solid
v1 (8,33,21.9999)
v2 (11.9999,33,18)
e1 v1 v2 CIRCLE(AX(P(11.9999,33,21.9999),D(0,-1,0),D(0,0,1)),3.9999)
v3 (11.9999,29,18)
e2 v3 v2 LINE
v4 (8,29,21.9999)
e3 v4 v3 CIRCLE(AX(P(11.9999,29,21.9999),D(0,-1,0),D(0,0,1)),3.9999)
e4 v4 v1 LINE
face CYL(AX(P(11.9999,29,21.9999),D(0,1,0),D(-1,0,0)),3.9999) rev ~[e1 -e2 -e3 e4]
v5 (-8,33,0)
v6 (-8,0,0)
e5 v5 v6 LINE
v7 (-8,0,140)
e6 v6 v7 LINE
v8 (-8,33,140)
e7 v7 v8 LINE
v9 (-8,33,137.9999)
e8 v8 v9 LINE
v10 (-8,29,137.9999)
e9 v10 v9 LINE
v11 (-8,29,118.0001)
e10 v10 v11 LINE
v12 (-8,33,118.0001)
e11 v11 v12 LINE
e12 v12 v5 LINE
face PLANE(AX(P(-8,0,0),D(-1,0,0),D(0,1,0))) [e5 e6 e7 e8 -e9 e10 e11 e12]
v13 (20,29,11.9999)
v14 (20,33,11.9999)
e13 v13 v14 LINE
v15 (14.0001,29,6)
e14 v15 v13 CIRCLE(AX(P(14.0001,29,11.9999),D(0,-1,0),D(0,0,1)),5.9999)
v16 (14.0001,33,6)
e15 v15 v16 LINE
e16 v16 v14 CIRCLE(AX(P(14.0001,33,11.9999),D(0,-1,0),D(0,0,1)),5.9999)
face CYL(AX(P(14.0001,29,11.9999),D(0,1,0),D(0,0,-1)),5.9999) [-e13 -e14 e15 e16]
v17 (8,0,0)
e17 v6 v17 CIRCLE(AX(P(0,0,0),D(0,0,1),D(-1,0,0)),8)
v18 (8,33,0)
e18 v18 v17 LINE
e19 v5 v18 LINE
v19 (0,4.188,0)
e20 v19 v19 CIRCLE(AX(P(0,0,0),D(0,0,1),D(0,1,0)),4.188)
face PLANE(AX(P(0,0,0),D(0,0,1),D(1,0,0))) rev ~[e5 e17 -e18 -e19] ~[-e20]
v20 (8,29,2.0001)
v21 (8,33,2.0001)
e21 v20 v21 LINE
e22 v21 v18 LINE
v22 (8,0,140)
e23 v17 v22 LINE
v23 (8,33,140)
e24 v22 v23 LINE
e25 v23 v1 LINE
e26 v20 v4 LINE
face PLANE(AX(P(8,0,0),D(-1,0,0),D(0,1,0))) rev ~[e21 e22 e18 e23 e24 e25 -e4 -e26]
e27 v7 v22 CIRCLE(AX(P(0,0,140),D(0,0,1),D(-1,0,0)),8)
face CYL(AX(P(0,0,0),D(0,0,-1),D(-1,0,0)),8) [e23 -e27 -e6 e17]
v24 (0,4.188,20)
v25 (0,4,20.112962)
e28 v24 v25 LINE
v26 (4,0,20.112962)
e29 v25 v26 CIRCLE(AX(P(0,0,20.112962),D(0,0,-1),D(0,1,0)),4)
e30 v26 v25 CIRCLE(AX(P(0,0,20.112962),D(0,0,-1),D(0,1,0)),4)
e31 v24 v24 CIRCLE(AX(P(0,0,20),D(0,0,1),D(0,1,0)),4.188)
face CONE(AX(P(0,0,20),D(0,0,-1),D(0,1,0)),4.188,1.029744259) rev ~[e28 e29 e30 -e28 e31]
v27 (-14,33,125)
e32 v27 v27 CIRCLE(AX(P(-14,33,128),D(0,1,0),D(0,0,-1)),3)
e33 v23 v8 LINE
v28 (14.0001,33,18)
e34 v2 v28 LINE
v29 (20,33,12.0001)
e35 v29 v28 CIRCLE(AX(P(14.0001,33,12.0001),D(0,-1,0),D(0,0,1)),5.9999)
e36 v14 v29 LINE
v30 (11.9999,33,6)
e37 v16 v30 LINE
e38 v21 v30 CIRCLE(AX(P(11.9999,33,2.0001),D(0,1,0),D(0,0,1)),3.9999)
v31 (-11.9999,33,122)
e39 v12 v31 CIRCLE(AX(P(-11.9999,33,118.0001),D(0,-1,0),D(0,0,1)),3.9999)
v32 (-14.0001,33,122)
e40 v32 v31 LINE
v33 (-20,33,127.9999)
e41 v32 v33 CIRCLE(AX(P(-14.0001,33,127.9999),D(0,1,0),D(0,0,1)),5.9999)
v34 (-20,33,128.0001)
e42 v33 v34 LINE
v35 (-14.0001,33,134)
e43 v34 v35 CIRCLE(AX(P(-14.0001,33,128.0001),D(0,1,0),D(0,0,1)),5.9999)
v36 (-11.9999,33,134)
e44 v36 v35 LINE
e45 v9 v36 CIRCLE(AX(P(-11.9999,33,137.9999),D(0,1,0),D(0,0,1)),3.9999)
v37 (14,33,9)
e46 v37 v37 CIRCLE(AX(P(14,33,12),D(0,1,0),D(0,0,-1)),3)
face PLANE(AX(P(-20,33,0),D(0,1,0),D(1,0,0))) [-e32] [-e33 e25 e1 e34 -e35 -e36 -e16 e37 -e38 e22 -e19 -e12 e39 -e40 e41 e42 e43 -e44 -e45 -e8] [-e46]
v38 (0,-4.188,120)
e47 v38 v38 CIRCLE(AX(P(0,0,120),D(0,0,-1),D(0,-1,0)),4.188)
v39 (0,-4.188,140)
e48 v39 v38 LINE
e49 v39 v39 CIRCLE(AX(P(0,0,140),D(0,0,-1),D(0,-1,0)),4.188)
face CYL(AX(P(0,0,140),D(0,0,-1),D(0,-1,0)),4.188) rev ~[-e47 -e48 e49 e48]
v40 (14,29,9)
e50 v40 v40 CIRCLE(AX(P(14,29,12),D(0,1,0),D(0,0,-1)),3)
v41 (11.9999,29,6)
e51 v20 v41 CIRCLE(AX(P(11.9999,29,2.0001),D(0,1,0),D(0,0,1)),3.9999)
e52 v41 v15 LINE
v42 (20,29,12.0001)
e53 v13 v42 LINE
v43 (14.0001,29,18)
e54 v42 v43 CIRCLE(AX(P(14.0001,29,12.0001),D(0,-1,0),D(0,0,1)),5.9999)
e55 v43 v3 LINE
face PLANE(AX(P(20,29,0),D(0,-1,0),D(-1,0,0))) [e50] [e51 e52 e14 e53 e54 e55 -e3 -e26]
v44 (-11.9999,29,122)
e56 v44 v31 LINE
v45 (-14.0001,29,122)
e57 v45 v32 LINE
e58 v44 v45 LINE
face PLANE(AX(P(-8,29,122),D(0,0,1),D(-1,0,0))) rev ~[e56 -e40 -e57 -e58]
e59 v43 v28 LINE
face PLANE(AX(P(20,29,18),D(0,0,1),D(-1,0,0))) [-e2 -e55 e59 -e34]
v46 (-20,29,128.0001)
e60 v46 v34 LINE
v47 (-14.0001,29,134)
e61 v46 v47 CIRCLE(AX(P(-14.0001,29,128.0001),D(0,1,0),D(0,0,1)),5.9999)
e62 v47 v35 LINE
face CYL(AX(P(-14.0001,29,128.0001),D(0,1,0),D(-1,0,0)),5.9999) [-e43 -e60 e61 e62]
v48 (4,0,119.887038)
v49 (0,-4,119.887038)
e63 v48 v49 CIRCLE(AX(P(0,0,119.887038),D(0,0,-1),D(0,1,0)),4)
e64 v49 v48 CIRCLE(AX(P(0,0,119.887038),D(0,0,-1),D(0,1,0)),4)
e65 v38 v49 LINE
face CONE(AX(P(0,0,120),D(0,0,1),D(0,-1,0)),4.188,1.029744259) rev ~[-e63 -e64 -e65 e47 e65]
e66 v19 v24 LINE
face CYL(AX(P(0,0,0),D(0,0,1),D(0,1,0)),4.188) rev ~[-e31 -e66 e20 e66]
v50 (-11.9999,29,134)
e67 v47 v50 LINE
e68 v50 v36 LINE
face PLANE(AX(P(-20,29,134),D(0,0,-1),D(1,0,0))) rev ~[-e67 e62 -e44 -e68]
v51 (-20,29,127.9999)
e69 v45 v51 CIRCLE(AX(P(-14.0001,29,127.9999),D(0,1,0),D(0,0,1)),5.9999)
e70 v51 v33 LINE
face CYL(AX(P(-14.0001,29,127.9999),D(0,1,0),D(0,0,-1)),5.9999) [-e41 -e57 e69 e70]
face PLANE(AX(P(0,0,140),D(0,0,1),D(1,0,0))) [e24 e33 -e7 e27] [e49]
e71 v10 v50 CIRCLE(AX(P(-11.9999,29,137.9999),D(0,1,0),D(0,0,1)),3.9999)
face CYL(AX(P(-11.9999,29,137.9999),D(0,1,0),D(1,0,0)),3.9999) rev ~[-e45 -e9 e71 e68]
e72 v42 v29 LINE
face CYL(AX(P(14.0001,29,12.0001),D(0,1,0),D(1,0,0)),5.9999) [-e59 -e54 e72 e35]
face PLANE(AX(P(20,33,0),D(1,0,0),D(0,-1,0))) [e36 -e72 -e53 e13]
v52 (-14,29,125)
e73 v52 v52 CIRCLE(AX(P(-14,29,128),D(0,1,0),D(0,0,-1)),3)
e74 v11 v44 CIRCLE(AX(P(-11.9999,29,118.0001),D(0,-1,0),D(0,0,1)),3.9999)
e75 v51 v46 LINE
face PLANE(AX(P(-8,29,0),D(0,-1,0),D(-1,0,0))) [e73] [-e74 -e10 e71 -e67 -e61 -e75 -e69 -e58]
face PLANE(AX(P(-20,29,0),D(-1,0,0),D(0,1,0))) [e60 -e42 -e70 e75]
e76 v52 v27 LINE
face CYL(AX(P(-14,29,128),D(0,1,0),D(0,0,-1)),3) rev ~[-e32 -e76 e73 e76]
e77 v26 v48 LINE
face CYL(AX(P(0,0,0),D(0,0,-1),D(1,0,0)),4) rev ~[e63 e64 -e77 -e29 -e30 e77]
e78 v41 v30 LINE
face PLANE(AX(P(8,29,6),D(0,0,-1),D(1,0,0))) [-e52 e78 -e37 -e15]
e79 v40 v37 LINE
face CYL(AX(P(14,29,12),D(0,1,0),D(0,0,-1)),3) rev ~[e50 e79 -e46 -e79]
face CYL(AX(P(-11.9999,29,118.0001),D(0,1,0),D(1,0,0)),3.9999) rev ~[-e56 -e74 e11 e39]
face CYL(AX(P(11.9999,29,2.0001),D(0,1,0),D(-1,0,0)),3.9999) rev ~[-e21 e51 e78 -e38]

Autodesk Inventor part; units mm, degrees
ref_plane "YZ Plane" through (0, 0, 0) normal (1, 0, 0) x (0, 1, 0)
ref_plane "XZ Plane" through (0, 0, 0) normal (0, 1, 0) x (-1, 0, 0)
ref_plane "XY Plane" through (0, 0, 0) normal (0, 0, 1) x (1, 0, 0)
sketch "Sketch7" plane through (0, 0, 0) normal (0, 0, 1) x (1, 0, 0)
  circle A0 centre (0, 0) radius 4
  arc A1 (-8, 0) -> (8, 0) centre (0, 0) ccw
  line L0 (-8, 29) -> (-20, 29)
  line L1 (-20, 29) -> (-20, 33)
  line L2 (-20, 33) -> (0, 33)
  line L3 (0, 33) -> (20, 33)
  line L4 (20, 33) -> (20, 29)
  line L5 (20, 29) -> (8, 29)
  line L6 (-8, 0) -> (-8, 29)
  line L7 (8, 0) -> (8, 29)
  dimension "d34" = 4
  dimension "d35" = 33
  dimension "d36" = 8
  dimension "d37" = 4
  dimension "d38" = 12
extrude "Extrusion6" add sketch "Sketch7" along normal blind 140
sketch "Sketch8" plane through (-20, 29, 0) normal (0, -1, 0) x (1, 0, 0)
  line L0 (12, 140) -> (0, 140) projected
  line L1 (0, 0) -> (0, 140) projected
  line L2 (0, 0) -> (12, 0) projected
  line L3 (12, 0) -> (12, 140) projected
  line L4 (40, 140) -> (28, 140) projected
  line L5 (28, 0) -> (28, 140) projected
  line L6 (28, 0) -> (40, 0) projected
  line L7 (40, 0) -> (40, 140) projected
  line L8 (0, 134) -> (12, 134)
  line L9 (12, 134) -> (12, 122)
  line L10 (12, 122) -> (0, 122)
  line L11 (0, 122) -> (0, 134)
  line L12 (28, 6) -> (40, 6)
  line L13 (40, 6) -> (40, 18)
  line L14 (40, 18) -> (28, 18)
  line L15 (28, 18) -> (28, 6)
  point P0 (20, 0)
  dimension "d41" = 12
  dimension "d42" = 6
  dimension "d43" = 6
extrude "Extrusion7" cut sketch "Sketch8" against normal blind 140 contours L3 L8 L1 L0 | L3 L2 L1 L10 | L7 L14 L5 L4 | L7 L6 L5 L12
fillet "Fillet1" radius 6 4 edges at (20, 31, 6) (20, 31, 18) (-20, 31, 134) (-20, 31, 122)
fillet "Fillet1" radius 4 4 edges at (-8, 31, 134) (-8, 31, 122) (8, 31, 6) (8, 31, 18)
sketch "Sketch9" plane through (-14, 29, 122) normal (0, -1, 0) x (1, 0, 0)
  arc A0 (0, 12) -> (0, 0) centre (0, 6) ccw projected
  arc A1 (28, -116) -> (28, -104) centre (28, -110) ccw projected
  line L0 (28, -104) -> (26, -104) projected
  arc A2 (22, -100) -> (26, -104) centre (26, -100) ccw projected
  line L1 (22, -120) -> (22, -100) projected
  arc A3 (26, -116) -> (22, -120) centre (26, -120) ccw projected
  line L2 (26, -116) -> (28, -116) projected
  point P0 (14, -122)
hole "Hole2" at (14, 29, 12) at (-14, 29, 128) direction (0, 1, 0) diameter 6 depth 8 tip angle 118 clearance for "Flat Head Machine Screw" size "M6" standard "Ansi Metric M Profile"
sketch "Sketch10" plane through (0, 0, 140) normal (0, 0, 1) x (1, 0, 0)
  arc A0 (-8, 0) -> (8, 0) centre (0, 0) ccw projected
hole "Hole3" at (0, 0, 140) direction (0, 0, -1) diameter 8.376 depth 20 tip angle 118 thread size "M10x1.5" class "6H" standard "ANSI Metric M Profile"
sketch "Sketch11" plane through (0, 0, 0) normal (0, 0, -1) x (-1, 0, 0)
  arc A0 (-8, 0) -> (8, 0) centre (0, 0) ccw projected
hole "Hole4" at (0, 0, 0) direction (0, 0, 1) diameter 8.376 depth 20 tip angle 118 thread size "M10x1.5" class "6H" standard "ANSI Metric M Profile"
ref_plane "Work Plane3" through (0, 0, 140) normal (1, 0, 0) x (0, 0, -1)
properties part number "Pusher.Holder" material "Aluminum-6061"
